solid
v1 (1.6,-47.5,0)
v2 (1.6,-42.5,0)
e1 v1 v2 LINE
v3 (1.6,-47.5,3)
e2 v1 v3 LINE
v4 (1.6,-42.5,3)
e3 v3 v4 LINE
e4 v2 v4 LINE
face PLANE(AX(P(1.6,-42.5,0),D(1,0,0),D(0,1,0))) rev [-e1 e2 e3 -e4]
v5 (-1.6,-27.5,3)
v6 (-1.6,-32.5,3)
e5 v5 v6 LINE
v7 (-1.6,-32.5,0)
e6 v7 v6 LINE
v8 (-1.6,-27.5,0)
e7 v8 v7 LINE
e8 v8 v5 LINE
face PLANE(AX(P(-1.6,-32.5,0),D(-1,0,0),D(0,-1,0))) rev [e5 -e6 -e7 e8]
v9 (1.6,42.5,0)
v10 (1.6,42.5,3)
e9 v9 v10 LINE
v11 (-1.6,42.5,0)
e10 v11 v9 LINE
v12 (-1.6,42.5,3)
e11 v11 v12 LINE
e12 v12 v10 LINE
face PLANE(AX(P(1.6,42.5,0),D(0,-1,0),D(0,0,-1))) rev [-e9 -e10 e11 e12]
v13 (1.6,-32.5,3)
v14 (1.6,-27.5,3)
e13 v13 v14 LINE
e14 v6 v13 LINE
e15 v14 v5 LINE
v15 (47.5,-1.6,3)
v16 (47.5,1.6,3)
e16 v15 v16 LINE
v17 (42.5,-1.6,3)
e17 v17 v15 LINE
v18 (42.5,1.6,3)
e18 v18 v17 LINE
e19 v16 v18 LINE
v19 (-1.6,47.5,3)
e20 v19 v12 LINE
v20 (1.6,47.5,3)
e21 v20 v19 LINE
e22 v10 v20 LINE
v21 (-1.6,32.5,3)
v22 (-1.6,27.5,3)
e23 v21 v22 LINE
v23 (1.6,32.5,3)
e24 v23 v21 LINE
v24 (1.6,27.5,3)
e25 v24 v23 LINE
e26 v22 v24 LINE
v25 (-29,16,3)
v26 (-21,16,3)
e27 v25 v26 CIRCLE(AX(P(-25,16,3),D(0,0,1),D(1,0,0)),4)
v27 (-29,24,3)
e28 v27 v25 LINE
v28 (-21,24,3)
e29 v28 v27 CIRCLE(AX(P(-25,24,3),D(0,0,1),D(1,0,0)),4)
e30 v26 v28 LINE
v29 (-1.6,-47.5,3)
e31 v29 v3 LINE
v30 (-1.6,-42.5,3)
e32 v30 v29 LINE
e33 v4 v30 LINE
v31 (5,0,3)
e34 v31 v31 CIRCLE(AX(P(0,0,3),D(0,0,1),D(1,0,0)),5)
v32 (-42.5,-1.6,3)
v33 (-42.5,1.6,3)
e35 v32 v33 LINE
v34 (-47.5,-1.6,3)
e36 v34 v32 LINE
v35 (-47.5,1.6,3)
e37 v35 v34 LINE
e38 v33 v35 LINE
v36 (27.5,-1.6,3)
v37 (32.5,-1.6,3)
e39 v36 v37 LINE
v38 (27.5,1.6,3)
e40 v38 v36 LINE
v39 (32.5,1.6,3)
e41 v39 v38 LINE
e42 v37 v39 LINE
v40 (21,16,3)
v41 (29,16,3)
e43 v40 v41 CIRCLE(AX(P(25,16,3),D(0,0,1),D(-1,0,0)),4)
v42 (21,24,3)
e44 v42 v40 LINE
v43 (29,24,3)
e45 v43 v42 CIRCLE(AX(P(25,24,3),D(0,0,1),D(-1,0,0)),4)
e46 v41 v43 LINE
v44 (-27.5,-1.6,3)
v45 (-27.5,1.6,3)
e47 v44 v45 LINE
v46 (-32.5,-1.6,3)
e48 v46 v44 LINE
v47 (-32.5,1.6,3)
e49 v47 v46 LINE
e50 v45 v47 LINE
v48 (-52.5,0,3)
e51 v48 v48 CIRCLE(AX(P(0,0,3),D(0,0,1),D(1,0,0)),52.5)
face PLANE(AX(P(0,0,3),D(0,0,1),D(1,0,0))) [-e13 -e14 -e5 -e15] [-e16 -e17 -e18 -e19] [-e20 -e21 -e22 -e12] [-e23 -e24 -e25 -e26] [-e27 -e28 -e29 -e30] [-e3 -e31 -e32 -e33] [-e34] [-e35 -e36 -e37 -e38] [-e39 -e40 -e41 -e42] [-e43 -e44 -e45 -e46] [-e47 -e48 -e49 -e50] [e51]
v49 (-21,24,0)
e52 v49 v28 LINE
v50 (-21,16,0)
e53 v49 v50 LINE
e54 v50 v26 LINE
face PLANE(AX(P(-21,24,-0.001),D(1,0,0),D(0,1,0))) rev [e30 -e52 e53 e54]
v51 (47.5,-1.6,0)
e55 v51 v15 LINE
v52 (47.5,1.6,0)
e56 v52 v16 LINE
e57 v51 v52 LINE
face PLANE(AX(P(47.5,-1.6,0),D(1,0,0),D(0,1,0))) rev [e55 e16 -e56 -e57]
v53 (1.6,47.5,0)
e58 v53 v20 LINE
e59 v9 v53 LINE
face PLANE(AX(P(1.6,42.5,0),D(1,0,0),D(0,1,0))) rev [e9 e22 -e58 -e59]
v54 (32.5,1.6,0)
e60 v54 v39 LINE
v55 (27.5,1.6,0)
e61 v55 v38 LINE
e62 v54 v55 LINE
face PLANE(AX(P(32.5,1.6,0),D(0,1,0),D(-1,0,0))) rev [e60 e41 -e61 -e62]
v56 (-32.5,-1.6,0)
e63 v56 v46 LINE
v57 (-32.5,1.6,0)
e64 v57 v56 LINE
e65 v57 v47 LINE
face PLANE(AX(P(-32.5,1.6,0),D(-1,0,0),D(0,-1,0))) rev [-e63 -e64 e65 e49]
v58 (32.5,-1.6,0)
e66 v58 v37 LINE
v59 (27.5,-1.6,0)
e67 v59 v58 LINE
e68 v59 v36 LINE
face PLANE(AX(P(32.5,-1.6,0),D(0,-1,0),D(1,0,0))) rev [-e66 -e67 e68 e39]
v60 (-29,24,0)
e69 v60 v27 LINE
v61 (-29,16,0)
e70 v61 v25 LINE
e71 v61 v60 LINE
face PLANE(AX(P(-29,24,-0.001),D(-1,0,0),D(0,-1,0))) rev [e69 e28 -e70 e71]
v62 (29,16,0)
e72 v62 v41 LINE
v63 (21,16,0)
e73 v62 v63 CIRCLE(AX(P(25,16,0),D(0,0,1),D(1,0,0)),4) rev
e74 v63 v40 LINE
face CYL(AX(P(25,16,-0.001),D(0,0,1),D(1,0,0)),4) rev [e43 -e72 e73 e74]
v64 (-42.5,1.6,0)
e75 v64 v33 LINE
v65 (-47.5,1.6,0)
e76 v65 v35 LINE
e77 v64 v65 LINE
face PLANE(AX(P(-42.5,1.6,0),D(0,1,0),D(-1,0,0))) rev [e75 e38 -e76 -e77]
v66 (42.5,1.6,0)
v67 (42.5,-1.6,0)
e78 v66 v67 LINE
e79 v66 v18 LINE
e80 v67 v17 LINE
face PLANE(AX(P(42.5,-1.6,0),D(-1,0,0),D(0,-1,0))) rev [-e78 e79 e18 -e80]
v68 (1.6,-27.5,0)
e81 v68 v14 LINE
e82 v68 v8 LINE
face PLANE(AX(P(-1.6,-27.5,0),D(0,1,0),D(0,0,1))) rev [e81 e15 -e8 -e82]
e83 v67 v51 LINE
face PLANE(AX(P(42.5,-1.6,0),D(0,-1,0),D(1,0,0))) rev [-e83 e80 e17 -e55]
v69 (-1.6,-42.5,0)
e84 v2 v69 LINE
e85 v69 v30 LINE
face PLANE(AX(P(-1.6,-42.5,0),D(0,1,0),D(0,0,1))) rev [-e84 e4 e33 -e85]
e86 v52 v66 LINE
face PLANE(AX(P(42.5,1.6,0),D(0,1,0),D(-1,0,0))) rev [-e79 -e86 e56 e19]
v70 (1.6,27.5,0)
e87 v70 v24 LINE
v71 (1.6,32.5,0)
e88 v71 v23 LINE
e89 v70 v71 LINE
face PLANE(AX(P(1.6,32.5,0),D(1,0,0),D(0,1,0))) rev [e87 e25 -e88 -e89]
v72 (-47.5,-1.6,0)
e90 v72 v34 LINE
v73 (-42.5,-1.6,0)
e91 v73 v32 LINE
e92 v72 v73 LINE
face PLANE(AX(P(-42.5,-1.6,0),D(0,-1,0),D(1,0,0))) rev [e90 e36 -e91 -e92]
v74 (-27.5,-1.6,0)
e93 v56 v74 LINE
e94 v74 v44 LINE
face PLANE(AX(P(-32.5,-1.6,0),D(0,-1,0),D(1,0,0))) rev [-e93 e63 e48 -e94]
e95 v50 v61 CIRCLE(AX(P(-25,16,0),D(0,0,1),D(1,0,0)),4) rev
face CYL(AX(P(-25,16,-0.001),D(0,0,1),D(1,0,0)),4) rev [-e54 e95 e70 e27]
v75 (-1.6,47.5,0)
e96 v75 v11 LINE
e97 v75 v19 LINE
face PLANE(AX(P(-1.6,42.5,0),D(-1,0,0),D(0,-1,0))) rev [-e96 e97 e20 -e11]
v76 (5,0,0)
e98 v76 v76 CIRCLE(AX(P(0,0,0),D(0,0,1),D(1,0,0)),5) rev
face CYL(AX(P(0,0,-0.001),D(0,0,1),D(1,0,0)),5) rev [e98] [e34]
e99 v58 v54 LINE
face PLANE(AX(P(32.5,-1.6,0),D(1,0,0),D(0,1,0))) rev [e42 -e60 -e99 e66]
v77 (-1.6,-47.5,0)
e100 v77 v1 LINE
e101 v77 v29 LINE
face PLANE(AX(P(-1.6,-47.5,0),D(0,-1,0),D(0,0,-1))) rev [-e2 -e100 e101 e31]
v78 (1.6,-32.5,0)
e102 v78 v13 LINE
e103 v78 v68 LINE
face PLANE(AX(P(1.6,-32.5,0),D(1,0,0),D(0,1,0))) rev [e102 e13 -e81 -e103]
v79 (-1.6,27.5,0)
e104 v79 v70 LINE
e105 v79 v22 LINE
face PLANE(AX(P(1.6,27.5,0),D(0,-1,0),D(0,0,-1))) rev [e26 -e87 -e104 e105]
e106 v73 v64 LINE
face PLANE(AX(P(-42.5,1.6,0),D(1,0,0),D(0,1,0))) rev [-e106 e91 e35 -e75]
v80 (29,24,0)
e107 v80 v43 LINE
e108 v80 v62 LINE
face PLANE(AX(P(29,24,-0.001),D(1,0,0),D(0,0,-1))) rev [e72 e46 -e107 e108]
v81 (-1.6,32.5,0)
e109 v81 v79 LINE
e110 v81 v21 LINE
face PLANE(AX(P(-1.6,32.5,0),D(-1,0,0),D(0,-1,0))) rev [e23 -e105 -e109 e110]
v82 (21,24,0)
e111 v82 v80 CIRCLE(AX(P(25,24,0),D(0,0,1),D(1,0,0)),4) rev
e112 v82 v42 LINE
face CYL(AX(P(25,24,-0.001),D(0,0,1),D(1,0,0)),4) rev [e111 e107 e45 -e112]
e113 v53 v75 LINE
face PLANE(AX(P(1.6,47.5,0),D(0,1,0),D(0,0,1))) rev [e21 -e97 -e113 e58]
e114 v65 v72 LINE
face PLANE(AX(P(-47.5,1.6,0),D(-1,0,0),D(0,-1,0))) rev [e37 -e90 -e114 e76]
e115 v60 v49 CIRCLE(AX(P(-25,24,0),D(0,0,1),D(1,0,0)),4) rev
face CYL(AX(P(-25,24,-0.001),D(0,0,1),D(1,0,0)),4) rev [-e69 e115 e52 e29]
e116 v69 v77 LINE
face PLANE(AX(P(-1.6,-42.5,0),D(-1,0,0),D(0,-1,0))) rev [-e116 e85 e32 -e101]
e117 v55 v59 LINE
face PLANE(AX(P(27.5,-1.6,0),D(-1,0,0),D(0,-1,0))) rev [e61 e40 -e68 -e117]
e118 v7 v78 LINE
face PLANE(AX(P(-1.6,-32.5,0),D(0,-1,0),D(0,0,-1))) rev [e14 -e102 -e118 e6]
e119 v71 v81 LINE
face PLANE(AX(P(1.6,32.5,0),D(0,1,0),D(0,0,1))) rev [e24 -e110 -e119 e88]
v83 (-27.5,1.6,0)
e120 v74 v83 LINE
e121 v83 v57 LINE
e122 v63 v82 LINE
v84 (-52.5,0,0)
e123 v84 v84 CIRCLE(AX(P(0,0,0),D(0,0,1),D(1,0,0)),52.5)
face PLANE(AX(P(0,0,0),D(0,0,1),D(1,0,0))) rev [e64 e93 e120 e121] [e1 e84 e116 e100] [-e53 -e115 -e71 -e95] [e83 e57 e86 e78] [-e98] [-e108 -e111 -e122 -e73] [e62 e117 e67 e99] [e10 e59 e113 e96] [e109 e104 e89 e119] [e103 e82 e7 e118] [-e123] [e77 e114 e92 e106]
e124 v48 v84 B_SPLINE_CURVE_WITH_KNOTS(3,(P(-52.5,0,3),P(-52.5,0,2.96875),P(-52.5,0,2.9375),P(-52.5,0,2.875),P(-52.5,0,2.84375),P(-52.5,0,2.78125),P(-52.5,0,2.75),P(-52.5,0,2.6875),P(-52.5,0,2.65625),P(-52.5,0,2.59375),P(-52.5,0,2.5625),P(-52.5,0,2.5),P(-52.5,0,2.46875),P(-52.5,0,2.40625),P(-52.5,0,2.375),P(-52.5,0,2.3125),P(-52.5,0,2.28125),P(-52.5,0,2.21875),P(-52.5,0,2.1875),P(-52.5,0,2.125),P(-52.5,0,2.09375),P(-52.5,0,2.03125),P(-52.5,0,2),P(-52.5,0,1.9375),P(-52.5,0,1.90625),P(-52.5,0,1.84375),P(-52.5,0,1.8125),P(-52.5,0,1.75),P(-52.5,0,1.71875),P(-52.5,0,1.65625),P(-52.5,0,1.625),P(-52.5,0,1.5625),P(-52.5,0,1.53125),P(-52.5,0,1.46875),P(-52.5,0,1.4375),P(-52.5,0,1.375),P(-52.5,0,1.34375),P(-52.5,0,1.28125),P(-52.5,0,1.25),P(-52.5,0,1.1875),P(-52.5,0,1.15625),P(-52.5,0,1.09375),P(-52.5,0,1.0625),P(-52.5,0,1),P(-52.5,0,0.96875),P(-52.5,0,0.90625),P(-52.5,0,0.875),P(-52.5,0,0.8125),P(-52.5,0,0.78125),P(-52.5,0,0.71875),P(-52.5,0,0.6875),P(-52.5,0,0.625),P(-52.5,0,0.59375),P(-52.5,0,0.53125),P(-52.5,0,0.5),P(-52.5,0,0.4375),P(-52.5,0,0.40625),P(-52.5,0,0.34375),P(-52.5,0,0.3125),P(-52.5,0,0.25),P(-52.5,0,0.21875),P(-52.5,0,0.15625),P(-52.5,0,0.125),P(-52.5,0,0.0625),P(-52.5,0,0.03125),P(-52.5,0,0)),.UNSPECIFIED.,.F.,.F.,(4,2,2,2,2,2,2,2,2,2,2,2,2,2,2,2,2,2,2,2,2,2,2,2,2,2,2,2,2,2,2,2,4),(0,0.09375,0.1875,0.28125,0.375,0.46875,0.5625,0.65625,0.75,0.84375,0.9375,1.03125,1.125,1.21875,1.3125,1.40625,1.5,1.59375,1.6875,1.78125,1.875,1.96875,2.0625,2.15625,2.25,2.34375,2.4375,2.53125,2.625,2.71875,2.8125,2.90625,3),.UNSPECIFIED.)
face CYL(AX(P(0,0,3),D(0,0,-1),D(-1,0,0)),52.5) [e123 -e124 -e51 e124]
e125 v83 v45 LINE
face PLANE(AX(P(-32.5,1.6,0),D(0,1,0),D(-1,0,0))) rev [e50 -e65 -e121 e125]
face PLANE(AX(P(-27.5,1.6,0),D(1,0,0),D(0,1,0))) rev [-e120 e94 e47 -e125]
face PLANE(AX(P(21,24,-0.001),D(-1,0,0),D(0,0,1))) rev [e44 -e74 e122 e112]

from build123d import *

# Parameters (mm, degrees)
SKETCH1_R               = 52.5
BOSS_EXTRUDE1_DEPTH     = 3
RIB_START               = -47.5
RIB_SLOT_OUTLINE_W      = 3.2
RIB_SLOT_OUTLINE_H      = 3
RIB_SLOT_DEPTH          = 5
RIB_START_2             = -32.5
RIB_SLOT_2_OUTLINE_W    = 3.2
RIB_SLOT_2_OUTLINE_H    = 3
RIB_SLOT_2_DEPTH        = 5
RIB_SLOT_PATTERN_COUNT  = 4
ANTENNA_CLEARANCE_REACH = 76.307
SKETCH3_R               = 5


# Read off the part's stored shape, not the designer's step: rib slot
with BuildPart() as part:
    # Sketch1 → Boss-Extrude1 (new body)
    with BuildSketch(Plane.XY):
        with Locations(Location((0, 0, 0), (0, 0, 180))):
            Circle(SKETCH1_R)
    extrude(amount=BOSS_EXTRUDE1_DEPTH)

    # rib slot outline → rib slot (cut)
    with BuildSketch(Plane(origin=(0, 0, 0), x_dir=(1, 0, 0), z_dir=(0, 1, 0)).offset(RIB_START)):
        with Locations((0, -1.5)):
            Rectangle(RIB_SLOT_OUTLINE_W, RIB_SLOT_OUTLINE_H)
    rib_slot = extrude(amount=RIB_SLOT_DEPTH, mode=Mode.SUBTRACT)

    # rib slot 2 outline → rib slot 2 (cut)
    with BuildSketch(Plane(origin=(0, 0, 0), x_dir=(1, 0, 0), z_dir=(0, 1, 0)).offset(RIB_START_2)):
        with Locations((0, -1.5)):
            Rectangle(RIB_SLOT_2_OUTLINE_W, RIB_SLOT_2_OUTLINE_H)
    rib_slot_2 = extrude(amount=RIB_SLOT_2_DEPTH, mode=Mode.SUBTRACT)

    # rib slot pattern: rib slot, rib slot 2 ×4 about axis
    rib_slot_pattern_axis = Axis((0, 0, 0), (0, 0, 1))
    add([rib_slot.rotate(rib_slot_pattern_axis, i * 360 / RIB_SLOT_PATTERN_COUNT) for i in range(1, RIB_SLOT_PATTERN_COUNT)], mode=Mode.SUBTRACT)
    add([rib_slot_2.rotate(rib_slot_pattern_axis, i * 360 / RIB_SLOT_PATTERN_COUNT) for i in range(1, RIB_SLOT_PATTERN_COUNT)], mode=Mode.SUBTRACT)

    # Sketch3 → antenna clearance (cut, up to next)
    with BuildSketch(Plane.XY.offset(3), mode=Mode.PRIVATE) as antenna_clearance_sk1:
        Circle(SKETCH3_R)
    antenna_clearance_tool1 = extrude(antenna_clearance_sk1.sketch, amount=-ANTENNA_CLEARANCE_REACH, mode=Mode.PRIVATE) & part.part
    # Sketch3 → antenna clearance (cut, up to next)
    with BuildSketch(Plane.XY.offset(3), mode=Mode.PRIVATE) as antenna_clearance_sk2:
        with BuildLine():
            Line((-21, 24), (-21, 16))
            ThreePointArc((-21, 16), (-25, 12), (-29, 16))
            Line((-29, 16), (-29, 24))
            ThreePointArc((-29, 24), (-25, 28), (-21, 24))
        make_face()
    antenna_clearance_tool2 = extrude(antenna_clearance_sk2.sketch, amount=-ANTENNA_CLEARANCE_REACH, mode=Mode.PRIVATE) & part.part
    # Sketch3 → antenna clearance (cut, up to next)
    with BuildSketch(Plane.XY.offset(3), mode=Mode.PRIVATE) as antenna_clearance_sk3:
        with BuildLine():
            Line((21, 24), (21, 16))
            ThreePointArc((21, 16), (25, 12), (29, 16))
            Line((29, 16), (29, 24))
            ThreePointArc((29, 24), (25, 28), (21, 24))
        make_face()
    antenna_clearance_tool3 = extrude(antenna_clearance_sk3.sketch, amount=-ANTENNA_CLEARANCE_REACH, mode=Mode.PRIVATE) & part.part
    add(antenna_clearance_tool1.solids().sort_by_distance((0, 0, 3))[0], mode=Mode.SUBTRACT)
    add(antenna_clearance_tool2.solids().sort_by_distance((-25, 20, 3))[0], mode=Mode.SUBTRACT)
    add(antenna_clearance_tool3.solids().sort_by_distance((25, 20, 3))[0], mode=Mode.SUBTRACT)


solid = part.part
